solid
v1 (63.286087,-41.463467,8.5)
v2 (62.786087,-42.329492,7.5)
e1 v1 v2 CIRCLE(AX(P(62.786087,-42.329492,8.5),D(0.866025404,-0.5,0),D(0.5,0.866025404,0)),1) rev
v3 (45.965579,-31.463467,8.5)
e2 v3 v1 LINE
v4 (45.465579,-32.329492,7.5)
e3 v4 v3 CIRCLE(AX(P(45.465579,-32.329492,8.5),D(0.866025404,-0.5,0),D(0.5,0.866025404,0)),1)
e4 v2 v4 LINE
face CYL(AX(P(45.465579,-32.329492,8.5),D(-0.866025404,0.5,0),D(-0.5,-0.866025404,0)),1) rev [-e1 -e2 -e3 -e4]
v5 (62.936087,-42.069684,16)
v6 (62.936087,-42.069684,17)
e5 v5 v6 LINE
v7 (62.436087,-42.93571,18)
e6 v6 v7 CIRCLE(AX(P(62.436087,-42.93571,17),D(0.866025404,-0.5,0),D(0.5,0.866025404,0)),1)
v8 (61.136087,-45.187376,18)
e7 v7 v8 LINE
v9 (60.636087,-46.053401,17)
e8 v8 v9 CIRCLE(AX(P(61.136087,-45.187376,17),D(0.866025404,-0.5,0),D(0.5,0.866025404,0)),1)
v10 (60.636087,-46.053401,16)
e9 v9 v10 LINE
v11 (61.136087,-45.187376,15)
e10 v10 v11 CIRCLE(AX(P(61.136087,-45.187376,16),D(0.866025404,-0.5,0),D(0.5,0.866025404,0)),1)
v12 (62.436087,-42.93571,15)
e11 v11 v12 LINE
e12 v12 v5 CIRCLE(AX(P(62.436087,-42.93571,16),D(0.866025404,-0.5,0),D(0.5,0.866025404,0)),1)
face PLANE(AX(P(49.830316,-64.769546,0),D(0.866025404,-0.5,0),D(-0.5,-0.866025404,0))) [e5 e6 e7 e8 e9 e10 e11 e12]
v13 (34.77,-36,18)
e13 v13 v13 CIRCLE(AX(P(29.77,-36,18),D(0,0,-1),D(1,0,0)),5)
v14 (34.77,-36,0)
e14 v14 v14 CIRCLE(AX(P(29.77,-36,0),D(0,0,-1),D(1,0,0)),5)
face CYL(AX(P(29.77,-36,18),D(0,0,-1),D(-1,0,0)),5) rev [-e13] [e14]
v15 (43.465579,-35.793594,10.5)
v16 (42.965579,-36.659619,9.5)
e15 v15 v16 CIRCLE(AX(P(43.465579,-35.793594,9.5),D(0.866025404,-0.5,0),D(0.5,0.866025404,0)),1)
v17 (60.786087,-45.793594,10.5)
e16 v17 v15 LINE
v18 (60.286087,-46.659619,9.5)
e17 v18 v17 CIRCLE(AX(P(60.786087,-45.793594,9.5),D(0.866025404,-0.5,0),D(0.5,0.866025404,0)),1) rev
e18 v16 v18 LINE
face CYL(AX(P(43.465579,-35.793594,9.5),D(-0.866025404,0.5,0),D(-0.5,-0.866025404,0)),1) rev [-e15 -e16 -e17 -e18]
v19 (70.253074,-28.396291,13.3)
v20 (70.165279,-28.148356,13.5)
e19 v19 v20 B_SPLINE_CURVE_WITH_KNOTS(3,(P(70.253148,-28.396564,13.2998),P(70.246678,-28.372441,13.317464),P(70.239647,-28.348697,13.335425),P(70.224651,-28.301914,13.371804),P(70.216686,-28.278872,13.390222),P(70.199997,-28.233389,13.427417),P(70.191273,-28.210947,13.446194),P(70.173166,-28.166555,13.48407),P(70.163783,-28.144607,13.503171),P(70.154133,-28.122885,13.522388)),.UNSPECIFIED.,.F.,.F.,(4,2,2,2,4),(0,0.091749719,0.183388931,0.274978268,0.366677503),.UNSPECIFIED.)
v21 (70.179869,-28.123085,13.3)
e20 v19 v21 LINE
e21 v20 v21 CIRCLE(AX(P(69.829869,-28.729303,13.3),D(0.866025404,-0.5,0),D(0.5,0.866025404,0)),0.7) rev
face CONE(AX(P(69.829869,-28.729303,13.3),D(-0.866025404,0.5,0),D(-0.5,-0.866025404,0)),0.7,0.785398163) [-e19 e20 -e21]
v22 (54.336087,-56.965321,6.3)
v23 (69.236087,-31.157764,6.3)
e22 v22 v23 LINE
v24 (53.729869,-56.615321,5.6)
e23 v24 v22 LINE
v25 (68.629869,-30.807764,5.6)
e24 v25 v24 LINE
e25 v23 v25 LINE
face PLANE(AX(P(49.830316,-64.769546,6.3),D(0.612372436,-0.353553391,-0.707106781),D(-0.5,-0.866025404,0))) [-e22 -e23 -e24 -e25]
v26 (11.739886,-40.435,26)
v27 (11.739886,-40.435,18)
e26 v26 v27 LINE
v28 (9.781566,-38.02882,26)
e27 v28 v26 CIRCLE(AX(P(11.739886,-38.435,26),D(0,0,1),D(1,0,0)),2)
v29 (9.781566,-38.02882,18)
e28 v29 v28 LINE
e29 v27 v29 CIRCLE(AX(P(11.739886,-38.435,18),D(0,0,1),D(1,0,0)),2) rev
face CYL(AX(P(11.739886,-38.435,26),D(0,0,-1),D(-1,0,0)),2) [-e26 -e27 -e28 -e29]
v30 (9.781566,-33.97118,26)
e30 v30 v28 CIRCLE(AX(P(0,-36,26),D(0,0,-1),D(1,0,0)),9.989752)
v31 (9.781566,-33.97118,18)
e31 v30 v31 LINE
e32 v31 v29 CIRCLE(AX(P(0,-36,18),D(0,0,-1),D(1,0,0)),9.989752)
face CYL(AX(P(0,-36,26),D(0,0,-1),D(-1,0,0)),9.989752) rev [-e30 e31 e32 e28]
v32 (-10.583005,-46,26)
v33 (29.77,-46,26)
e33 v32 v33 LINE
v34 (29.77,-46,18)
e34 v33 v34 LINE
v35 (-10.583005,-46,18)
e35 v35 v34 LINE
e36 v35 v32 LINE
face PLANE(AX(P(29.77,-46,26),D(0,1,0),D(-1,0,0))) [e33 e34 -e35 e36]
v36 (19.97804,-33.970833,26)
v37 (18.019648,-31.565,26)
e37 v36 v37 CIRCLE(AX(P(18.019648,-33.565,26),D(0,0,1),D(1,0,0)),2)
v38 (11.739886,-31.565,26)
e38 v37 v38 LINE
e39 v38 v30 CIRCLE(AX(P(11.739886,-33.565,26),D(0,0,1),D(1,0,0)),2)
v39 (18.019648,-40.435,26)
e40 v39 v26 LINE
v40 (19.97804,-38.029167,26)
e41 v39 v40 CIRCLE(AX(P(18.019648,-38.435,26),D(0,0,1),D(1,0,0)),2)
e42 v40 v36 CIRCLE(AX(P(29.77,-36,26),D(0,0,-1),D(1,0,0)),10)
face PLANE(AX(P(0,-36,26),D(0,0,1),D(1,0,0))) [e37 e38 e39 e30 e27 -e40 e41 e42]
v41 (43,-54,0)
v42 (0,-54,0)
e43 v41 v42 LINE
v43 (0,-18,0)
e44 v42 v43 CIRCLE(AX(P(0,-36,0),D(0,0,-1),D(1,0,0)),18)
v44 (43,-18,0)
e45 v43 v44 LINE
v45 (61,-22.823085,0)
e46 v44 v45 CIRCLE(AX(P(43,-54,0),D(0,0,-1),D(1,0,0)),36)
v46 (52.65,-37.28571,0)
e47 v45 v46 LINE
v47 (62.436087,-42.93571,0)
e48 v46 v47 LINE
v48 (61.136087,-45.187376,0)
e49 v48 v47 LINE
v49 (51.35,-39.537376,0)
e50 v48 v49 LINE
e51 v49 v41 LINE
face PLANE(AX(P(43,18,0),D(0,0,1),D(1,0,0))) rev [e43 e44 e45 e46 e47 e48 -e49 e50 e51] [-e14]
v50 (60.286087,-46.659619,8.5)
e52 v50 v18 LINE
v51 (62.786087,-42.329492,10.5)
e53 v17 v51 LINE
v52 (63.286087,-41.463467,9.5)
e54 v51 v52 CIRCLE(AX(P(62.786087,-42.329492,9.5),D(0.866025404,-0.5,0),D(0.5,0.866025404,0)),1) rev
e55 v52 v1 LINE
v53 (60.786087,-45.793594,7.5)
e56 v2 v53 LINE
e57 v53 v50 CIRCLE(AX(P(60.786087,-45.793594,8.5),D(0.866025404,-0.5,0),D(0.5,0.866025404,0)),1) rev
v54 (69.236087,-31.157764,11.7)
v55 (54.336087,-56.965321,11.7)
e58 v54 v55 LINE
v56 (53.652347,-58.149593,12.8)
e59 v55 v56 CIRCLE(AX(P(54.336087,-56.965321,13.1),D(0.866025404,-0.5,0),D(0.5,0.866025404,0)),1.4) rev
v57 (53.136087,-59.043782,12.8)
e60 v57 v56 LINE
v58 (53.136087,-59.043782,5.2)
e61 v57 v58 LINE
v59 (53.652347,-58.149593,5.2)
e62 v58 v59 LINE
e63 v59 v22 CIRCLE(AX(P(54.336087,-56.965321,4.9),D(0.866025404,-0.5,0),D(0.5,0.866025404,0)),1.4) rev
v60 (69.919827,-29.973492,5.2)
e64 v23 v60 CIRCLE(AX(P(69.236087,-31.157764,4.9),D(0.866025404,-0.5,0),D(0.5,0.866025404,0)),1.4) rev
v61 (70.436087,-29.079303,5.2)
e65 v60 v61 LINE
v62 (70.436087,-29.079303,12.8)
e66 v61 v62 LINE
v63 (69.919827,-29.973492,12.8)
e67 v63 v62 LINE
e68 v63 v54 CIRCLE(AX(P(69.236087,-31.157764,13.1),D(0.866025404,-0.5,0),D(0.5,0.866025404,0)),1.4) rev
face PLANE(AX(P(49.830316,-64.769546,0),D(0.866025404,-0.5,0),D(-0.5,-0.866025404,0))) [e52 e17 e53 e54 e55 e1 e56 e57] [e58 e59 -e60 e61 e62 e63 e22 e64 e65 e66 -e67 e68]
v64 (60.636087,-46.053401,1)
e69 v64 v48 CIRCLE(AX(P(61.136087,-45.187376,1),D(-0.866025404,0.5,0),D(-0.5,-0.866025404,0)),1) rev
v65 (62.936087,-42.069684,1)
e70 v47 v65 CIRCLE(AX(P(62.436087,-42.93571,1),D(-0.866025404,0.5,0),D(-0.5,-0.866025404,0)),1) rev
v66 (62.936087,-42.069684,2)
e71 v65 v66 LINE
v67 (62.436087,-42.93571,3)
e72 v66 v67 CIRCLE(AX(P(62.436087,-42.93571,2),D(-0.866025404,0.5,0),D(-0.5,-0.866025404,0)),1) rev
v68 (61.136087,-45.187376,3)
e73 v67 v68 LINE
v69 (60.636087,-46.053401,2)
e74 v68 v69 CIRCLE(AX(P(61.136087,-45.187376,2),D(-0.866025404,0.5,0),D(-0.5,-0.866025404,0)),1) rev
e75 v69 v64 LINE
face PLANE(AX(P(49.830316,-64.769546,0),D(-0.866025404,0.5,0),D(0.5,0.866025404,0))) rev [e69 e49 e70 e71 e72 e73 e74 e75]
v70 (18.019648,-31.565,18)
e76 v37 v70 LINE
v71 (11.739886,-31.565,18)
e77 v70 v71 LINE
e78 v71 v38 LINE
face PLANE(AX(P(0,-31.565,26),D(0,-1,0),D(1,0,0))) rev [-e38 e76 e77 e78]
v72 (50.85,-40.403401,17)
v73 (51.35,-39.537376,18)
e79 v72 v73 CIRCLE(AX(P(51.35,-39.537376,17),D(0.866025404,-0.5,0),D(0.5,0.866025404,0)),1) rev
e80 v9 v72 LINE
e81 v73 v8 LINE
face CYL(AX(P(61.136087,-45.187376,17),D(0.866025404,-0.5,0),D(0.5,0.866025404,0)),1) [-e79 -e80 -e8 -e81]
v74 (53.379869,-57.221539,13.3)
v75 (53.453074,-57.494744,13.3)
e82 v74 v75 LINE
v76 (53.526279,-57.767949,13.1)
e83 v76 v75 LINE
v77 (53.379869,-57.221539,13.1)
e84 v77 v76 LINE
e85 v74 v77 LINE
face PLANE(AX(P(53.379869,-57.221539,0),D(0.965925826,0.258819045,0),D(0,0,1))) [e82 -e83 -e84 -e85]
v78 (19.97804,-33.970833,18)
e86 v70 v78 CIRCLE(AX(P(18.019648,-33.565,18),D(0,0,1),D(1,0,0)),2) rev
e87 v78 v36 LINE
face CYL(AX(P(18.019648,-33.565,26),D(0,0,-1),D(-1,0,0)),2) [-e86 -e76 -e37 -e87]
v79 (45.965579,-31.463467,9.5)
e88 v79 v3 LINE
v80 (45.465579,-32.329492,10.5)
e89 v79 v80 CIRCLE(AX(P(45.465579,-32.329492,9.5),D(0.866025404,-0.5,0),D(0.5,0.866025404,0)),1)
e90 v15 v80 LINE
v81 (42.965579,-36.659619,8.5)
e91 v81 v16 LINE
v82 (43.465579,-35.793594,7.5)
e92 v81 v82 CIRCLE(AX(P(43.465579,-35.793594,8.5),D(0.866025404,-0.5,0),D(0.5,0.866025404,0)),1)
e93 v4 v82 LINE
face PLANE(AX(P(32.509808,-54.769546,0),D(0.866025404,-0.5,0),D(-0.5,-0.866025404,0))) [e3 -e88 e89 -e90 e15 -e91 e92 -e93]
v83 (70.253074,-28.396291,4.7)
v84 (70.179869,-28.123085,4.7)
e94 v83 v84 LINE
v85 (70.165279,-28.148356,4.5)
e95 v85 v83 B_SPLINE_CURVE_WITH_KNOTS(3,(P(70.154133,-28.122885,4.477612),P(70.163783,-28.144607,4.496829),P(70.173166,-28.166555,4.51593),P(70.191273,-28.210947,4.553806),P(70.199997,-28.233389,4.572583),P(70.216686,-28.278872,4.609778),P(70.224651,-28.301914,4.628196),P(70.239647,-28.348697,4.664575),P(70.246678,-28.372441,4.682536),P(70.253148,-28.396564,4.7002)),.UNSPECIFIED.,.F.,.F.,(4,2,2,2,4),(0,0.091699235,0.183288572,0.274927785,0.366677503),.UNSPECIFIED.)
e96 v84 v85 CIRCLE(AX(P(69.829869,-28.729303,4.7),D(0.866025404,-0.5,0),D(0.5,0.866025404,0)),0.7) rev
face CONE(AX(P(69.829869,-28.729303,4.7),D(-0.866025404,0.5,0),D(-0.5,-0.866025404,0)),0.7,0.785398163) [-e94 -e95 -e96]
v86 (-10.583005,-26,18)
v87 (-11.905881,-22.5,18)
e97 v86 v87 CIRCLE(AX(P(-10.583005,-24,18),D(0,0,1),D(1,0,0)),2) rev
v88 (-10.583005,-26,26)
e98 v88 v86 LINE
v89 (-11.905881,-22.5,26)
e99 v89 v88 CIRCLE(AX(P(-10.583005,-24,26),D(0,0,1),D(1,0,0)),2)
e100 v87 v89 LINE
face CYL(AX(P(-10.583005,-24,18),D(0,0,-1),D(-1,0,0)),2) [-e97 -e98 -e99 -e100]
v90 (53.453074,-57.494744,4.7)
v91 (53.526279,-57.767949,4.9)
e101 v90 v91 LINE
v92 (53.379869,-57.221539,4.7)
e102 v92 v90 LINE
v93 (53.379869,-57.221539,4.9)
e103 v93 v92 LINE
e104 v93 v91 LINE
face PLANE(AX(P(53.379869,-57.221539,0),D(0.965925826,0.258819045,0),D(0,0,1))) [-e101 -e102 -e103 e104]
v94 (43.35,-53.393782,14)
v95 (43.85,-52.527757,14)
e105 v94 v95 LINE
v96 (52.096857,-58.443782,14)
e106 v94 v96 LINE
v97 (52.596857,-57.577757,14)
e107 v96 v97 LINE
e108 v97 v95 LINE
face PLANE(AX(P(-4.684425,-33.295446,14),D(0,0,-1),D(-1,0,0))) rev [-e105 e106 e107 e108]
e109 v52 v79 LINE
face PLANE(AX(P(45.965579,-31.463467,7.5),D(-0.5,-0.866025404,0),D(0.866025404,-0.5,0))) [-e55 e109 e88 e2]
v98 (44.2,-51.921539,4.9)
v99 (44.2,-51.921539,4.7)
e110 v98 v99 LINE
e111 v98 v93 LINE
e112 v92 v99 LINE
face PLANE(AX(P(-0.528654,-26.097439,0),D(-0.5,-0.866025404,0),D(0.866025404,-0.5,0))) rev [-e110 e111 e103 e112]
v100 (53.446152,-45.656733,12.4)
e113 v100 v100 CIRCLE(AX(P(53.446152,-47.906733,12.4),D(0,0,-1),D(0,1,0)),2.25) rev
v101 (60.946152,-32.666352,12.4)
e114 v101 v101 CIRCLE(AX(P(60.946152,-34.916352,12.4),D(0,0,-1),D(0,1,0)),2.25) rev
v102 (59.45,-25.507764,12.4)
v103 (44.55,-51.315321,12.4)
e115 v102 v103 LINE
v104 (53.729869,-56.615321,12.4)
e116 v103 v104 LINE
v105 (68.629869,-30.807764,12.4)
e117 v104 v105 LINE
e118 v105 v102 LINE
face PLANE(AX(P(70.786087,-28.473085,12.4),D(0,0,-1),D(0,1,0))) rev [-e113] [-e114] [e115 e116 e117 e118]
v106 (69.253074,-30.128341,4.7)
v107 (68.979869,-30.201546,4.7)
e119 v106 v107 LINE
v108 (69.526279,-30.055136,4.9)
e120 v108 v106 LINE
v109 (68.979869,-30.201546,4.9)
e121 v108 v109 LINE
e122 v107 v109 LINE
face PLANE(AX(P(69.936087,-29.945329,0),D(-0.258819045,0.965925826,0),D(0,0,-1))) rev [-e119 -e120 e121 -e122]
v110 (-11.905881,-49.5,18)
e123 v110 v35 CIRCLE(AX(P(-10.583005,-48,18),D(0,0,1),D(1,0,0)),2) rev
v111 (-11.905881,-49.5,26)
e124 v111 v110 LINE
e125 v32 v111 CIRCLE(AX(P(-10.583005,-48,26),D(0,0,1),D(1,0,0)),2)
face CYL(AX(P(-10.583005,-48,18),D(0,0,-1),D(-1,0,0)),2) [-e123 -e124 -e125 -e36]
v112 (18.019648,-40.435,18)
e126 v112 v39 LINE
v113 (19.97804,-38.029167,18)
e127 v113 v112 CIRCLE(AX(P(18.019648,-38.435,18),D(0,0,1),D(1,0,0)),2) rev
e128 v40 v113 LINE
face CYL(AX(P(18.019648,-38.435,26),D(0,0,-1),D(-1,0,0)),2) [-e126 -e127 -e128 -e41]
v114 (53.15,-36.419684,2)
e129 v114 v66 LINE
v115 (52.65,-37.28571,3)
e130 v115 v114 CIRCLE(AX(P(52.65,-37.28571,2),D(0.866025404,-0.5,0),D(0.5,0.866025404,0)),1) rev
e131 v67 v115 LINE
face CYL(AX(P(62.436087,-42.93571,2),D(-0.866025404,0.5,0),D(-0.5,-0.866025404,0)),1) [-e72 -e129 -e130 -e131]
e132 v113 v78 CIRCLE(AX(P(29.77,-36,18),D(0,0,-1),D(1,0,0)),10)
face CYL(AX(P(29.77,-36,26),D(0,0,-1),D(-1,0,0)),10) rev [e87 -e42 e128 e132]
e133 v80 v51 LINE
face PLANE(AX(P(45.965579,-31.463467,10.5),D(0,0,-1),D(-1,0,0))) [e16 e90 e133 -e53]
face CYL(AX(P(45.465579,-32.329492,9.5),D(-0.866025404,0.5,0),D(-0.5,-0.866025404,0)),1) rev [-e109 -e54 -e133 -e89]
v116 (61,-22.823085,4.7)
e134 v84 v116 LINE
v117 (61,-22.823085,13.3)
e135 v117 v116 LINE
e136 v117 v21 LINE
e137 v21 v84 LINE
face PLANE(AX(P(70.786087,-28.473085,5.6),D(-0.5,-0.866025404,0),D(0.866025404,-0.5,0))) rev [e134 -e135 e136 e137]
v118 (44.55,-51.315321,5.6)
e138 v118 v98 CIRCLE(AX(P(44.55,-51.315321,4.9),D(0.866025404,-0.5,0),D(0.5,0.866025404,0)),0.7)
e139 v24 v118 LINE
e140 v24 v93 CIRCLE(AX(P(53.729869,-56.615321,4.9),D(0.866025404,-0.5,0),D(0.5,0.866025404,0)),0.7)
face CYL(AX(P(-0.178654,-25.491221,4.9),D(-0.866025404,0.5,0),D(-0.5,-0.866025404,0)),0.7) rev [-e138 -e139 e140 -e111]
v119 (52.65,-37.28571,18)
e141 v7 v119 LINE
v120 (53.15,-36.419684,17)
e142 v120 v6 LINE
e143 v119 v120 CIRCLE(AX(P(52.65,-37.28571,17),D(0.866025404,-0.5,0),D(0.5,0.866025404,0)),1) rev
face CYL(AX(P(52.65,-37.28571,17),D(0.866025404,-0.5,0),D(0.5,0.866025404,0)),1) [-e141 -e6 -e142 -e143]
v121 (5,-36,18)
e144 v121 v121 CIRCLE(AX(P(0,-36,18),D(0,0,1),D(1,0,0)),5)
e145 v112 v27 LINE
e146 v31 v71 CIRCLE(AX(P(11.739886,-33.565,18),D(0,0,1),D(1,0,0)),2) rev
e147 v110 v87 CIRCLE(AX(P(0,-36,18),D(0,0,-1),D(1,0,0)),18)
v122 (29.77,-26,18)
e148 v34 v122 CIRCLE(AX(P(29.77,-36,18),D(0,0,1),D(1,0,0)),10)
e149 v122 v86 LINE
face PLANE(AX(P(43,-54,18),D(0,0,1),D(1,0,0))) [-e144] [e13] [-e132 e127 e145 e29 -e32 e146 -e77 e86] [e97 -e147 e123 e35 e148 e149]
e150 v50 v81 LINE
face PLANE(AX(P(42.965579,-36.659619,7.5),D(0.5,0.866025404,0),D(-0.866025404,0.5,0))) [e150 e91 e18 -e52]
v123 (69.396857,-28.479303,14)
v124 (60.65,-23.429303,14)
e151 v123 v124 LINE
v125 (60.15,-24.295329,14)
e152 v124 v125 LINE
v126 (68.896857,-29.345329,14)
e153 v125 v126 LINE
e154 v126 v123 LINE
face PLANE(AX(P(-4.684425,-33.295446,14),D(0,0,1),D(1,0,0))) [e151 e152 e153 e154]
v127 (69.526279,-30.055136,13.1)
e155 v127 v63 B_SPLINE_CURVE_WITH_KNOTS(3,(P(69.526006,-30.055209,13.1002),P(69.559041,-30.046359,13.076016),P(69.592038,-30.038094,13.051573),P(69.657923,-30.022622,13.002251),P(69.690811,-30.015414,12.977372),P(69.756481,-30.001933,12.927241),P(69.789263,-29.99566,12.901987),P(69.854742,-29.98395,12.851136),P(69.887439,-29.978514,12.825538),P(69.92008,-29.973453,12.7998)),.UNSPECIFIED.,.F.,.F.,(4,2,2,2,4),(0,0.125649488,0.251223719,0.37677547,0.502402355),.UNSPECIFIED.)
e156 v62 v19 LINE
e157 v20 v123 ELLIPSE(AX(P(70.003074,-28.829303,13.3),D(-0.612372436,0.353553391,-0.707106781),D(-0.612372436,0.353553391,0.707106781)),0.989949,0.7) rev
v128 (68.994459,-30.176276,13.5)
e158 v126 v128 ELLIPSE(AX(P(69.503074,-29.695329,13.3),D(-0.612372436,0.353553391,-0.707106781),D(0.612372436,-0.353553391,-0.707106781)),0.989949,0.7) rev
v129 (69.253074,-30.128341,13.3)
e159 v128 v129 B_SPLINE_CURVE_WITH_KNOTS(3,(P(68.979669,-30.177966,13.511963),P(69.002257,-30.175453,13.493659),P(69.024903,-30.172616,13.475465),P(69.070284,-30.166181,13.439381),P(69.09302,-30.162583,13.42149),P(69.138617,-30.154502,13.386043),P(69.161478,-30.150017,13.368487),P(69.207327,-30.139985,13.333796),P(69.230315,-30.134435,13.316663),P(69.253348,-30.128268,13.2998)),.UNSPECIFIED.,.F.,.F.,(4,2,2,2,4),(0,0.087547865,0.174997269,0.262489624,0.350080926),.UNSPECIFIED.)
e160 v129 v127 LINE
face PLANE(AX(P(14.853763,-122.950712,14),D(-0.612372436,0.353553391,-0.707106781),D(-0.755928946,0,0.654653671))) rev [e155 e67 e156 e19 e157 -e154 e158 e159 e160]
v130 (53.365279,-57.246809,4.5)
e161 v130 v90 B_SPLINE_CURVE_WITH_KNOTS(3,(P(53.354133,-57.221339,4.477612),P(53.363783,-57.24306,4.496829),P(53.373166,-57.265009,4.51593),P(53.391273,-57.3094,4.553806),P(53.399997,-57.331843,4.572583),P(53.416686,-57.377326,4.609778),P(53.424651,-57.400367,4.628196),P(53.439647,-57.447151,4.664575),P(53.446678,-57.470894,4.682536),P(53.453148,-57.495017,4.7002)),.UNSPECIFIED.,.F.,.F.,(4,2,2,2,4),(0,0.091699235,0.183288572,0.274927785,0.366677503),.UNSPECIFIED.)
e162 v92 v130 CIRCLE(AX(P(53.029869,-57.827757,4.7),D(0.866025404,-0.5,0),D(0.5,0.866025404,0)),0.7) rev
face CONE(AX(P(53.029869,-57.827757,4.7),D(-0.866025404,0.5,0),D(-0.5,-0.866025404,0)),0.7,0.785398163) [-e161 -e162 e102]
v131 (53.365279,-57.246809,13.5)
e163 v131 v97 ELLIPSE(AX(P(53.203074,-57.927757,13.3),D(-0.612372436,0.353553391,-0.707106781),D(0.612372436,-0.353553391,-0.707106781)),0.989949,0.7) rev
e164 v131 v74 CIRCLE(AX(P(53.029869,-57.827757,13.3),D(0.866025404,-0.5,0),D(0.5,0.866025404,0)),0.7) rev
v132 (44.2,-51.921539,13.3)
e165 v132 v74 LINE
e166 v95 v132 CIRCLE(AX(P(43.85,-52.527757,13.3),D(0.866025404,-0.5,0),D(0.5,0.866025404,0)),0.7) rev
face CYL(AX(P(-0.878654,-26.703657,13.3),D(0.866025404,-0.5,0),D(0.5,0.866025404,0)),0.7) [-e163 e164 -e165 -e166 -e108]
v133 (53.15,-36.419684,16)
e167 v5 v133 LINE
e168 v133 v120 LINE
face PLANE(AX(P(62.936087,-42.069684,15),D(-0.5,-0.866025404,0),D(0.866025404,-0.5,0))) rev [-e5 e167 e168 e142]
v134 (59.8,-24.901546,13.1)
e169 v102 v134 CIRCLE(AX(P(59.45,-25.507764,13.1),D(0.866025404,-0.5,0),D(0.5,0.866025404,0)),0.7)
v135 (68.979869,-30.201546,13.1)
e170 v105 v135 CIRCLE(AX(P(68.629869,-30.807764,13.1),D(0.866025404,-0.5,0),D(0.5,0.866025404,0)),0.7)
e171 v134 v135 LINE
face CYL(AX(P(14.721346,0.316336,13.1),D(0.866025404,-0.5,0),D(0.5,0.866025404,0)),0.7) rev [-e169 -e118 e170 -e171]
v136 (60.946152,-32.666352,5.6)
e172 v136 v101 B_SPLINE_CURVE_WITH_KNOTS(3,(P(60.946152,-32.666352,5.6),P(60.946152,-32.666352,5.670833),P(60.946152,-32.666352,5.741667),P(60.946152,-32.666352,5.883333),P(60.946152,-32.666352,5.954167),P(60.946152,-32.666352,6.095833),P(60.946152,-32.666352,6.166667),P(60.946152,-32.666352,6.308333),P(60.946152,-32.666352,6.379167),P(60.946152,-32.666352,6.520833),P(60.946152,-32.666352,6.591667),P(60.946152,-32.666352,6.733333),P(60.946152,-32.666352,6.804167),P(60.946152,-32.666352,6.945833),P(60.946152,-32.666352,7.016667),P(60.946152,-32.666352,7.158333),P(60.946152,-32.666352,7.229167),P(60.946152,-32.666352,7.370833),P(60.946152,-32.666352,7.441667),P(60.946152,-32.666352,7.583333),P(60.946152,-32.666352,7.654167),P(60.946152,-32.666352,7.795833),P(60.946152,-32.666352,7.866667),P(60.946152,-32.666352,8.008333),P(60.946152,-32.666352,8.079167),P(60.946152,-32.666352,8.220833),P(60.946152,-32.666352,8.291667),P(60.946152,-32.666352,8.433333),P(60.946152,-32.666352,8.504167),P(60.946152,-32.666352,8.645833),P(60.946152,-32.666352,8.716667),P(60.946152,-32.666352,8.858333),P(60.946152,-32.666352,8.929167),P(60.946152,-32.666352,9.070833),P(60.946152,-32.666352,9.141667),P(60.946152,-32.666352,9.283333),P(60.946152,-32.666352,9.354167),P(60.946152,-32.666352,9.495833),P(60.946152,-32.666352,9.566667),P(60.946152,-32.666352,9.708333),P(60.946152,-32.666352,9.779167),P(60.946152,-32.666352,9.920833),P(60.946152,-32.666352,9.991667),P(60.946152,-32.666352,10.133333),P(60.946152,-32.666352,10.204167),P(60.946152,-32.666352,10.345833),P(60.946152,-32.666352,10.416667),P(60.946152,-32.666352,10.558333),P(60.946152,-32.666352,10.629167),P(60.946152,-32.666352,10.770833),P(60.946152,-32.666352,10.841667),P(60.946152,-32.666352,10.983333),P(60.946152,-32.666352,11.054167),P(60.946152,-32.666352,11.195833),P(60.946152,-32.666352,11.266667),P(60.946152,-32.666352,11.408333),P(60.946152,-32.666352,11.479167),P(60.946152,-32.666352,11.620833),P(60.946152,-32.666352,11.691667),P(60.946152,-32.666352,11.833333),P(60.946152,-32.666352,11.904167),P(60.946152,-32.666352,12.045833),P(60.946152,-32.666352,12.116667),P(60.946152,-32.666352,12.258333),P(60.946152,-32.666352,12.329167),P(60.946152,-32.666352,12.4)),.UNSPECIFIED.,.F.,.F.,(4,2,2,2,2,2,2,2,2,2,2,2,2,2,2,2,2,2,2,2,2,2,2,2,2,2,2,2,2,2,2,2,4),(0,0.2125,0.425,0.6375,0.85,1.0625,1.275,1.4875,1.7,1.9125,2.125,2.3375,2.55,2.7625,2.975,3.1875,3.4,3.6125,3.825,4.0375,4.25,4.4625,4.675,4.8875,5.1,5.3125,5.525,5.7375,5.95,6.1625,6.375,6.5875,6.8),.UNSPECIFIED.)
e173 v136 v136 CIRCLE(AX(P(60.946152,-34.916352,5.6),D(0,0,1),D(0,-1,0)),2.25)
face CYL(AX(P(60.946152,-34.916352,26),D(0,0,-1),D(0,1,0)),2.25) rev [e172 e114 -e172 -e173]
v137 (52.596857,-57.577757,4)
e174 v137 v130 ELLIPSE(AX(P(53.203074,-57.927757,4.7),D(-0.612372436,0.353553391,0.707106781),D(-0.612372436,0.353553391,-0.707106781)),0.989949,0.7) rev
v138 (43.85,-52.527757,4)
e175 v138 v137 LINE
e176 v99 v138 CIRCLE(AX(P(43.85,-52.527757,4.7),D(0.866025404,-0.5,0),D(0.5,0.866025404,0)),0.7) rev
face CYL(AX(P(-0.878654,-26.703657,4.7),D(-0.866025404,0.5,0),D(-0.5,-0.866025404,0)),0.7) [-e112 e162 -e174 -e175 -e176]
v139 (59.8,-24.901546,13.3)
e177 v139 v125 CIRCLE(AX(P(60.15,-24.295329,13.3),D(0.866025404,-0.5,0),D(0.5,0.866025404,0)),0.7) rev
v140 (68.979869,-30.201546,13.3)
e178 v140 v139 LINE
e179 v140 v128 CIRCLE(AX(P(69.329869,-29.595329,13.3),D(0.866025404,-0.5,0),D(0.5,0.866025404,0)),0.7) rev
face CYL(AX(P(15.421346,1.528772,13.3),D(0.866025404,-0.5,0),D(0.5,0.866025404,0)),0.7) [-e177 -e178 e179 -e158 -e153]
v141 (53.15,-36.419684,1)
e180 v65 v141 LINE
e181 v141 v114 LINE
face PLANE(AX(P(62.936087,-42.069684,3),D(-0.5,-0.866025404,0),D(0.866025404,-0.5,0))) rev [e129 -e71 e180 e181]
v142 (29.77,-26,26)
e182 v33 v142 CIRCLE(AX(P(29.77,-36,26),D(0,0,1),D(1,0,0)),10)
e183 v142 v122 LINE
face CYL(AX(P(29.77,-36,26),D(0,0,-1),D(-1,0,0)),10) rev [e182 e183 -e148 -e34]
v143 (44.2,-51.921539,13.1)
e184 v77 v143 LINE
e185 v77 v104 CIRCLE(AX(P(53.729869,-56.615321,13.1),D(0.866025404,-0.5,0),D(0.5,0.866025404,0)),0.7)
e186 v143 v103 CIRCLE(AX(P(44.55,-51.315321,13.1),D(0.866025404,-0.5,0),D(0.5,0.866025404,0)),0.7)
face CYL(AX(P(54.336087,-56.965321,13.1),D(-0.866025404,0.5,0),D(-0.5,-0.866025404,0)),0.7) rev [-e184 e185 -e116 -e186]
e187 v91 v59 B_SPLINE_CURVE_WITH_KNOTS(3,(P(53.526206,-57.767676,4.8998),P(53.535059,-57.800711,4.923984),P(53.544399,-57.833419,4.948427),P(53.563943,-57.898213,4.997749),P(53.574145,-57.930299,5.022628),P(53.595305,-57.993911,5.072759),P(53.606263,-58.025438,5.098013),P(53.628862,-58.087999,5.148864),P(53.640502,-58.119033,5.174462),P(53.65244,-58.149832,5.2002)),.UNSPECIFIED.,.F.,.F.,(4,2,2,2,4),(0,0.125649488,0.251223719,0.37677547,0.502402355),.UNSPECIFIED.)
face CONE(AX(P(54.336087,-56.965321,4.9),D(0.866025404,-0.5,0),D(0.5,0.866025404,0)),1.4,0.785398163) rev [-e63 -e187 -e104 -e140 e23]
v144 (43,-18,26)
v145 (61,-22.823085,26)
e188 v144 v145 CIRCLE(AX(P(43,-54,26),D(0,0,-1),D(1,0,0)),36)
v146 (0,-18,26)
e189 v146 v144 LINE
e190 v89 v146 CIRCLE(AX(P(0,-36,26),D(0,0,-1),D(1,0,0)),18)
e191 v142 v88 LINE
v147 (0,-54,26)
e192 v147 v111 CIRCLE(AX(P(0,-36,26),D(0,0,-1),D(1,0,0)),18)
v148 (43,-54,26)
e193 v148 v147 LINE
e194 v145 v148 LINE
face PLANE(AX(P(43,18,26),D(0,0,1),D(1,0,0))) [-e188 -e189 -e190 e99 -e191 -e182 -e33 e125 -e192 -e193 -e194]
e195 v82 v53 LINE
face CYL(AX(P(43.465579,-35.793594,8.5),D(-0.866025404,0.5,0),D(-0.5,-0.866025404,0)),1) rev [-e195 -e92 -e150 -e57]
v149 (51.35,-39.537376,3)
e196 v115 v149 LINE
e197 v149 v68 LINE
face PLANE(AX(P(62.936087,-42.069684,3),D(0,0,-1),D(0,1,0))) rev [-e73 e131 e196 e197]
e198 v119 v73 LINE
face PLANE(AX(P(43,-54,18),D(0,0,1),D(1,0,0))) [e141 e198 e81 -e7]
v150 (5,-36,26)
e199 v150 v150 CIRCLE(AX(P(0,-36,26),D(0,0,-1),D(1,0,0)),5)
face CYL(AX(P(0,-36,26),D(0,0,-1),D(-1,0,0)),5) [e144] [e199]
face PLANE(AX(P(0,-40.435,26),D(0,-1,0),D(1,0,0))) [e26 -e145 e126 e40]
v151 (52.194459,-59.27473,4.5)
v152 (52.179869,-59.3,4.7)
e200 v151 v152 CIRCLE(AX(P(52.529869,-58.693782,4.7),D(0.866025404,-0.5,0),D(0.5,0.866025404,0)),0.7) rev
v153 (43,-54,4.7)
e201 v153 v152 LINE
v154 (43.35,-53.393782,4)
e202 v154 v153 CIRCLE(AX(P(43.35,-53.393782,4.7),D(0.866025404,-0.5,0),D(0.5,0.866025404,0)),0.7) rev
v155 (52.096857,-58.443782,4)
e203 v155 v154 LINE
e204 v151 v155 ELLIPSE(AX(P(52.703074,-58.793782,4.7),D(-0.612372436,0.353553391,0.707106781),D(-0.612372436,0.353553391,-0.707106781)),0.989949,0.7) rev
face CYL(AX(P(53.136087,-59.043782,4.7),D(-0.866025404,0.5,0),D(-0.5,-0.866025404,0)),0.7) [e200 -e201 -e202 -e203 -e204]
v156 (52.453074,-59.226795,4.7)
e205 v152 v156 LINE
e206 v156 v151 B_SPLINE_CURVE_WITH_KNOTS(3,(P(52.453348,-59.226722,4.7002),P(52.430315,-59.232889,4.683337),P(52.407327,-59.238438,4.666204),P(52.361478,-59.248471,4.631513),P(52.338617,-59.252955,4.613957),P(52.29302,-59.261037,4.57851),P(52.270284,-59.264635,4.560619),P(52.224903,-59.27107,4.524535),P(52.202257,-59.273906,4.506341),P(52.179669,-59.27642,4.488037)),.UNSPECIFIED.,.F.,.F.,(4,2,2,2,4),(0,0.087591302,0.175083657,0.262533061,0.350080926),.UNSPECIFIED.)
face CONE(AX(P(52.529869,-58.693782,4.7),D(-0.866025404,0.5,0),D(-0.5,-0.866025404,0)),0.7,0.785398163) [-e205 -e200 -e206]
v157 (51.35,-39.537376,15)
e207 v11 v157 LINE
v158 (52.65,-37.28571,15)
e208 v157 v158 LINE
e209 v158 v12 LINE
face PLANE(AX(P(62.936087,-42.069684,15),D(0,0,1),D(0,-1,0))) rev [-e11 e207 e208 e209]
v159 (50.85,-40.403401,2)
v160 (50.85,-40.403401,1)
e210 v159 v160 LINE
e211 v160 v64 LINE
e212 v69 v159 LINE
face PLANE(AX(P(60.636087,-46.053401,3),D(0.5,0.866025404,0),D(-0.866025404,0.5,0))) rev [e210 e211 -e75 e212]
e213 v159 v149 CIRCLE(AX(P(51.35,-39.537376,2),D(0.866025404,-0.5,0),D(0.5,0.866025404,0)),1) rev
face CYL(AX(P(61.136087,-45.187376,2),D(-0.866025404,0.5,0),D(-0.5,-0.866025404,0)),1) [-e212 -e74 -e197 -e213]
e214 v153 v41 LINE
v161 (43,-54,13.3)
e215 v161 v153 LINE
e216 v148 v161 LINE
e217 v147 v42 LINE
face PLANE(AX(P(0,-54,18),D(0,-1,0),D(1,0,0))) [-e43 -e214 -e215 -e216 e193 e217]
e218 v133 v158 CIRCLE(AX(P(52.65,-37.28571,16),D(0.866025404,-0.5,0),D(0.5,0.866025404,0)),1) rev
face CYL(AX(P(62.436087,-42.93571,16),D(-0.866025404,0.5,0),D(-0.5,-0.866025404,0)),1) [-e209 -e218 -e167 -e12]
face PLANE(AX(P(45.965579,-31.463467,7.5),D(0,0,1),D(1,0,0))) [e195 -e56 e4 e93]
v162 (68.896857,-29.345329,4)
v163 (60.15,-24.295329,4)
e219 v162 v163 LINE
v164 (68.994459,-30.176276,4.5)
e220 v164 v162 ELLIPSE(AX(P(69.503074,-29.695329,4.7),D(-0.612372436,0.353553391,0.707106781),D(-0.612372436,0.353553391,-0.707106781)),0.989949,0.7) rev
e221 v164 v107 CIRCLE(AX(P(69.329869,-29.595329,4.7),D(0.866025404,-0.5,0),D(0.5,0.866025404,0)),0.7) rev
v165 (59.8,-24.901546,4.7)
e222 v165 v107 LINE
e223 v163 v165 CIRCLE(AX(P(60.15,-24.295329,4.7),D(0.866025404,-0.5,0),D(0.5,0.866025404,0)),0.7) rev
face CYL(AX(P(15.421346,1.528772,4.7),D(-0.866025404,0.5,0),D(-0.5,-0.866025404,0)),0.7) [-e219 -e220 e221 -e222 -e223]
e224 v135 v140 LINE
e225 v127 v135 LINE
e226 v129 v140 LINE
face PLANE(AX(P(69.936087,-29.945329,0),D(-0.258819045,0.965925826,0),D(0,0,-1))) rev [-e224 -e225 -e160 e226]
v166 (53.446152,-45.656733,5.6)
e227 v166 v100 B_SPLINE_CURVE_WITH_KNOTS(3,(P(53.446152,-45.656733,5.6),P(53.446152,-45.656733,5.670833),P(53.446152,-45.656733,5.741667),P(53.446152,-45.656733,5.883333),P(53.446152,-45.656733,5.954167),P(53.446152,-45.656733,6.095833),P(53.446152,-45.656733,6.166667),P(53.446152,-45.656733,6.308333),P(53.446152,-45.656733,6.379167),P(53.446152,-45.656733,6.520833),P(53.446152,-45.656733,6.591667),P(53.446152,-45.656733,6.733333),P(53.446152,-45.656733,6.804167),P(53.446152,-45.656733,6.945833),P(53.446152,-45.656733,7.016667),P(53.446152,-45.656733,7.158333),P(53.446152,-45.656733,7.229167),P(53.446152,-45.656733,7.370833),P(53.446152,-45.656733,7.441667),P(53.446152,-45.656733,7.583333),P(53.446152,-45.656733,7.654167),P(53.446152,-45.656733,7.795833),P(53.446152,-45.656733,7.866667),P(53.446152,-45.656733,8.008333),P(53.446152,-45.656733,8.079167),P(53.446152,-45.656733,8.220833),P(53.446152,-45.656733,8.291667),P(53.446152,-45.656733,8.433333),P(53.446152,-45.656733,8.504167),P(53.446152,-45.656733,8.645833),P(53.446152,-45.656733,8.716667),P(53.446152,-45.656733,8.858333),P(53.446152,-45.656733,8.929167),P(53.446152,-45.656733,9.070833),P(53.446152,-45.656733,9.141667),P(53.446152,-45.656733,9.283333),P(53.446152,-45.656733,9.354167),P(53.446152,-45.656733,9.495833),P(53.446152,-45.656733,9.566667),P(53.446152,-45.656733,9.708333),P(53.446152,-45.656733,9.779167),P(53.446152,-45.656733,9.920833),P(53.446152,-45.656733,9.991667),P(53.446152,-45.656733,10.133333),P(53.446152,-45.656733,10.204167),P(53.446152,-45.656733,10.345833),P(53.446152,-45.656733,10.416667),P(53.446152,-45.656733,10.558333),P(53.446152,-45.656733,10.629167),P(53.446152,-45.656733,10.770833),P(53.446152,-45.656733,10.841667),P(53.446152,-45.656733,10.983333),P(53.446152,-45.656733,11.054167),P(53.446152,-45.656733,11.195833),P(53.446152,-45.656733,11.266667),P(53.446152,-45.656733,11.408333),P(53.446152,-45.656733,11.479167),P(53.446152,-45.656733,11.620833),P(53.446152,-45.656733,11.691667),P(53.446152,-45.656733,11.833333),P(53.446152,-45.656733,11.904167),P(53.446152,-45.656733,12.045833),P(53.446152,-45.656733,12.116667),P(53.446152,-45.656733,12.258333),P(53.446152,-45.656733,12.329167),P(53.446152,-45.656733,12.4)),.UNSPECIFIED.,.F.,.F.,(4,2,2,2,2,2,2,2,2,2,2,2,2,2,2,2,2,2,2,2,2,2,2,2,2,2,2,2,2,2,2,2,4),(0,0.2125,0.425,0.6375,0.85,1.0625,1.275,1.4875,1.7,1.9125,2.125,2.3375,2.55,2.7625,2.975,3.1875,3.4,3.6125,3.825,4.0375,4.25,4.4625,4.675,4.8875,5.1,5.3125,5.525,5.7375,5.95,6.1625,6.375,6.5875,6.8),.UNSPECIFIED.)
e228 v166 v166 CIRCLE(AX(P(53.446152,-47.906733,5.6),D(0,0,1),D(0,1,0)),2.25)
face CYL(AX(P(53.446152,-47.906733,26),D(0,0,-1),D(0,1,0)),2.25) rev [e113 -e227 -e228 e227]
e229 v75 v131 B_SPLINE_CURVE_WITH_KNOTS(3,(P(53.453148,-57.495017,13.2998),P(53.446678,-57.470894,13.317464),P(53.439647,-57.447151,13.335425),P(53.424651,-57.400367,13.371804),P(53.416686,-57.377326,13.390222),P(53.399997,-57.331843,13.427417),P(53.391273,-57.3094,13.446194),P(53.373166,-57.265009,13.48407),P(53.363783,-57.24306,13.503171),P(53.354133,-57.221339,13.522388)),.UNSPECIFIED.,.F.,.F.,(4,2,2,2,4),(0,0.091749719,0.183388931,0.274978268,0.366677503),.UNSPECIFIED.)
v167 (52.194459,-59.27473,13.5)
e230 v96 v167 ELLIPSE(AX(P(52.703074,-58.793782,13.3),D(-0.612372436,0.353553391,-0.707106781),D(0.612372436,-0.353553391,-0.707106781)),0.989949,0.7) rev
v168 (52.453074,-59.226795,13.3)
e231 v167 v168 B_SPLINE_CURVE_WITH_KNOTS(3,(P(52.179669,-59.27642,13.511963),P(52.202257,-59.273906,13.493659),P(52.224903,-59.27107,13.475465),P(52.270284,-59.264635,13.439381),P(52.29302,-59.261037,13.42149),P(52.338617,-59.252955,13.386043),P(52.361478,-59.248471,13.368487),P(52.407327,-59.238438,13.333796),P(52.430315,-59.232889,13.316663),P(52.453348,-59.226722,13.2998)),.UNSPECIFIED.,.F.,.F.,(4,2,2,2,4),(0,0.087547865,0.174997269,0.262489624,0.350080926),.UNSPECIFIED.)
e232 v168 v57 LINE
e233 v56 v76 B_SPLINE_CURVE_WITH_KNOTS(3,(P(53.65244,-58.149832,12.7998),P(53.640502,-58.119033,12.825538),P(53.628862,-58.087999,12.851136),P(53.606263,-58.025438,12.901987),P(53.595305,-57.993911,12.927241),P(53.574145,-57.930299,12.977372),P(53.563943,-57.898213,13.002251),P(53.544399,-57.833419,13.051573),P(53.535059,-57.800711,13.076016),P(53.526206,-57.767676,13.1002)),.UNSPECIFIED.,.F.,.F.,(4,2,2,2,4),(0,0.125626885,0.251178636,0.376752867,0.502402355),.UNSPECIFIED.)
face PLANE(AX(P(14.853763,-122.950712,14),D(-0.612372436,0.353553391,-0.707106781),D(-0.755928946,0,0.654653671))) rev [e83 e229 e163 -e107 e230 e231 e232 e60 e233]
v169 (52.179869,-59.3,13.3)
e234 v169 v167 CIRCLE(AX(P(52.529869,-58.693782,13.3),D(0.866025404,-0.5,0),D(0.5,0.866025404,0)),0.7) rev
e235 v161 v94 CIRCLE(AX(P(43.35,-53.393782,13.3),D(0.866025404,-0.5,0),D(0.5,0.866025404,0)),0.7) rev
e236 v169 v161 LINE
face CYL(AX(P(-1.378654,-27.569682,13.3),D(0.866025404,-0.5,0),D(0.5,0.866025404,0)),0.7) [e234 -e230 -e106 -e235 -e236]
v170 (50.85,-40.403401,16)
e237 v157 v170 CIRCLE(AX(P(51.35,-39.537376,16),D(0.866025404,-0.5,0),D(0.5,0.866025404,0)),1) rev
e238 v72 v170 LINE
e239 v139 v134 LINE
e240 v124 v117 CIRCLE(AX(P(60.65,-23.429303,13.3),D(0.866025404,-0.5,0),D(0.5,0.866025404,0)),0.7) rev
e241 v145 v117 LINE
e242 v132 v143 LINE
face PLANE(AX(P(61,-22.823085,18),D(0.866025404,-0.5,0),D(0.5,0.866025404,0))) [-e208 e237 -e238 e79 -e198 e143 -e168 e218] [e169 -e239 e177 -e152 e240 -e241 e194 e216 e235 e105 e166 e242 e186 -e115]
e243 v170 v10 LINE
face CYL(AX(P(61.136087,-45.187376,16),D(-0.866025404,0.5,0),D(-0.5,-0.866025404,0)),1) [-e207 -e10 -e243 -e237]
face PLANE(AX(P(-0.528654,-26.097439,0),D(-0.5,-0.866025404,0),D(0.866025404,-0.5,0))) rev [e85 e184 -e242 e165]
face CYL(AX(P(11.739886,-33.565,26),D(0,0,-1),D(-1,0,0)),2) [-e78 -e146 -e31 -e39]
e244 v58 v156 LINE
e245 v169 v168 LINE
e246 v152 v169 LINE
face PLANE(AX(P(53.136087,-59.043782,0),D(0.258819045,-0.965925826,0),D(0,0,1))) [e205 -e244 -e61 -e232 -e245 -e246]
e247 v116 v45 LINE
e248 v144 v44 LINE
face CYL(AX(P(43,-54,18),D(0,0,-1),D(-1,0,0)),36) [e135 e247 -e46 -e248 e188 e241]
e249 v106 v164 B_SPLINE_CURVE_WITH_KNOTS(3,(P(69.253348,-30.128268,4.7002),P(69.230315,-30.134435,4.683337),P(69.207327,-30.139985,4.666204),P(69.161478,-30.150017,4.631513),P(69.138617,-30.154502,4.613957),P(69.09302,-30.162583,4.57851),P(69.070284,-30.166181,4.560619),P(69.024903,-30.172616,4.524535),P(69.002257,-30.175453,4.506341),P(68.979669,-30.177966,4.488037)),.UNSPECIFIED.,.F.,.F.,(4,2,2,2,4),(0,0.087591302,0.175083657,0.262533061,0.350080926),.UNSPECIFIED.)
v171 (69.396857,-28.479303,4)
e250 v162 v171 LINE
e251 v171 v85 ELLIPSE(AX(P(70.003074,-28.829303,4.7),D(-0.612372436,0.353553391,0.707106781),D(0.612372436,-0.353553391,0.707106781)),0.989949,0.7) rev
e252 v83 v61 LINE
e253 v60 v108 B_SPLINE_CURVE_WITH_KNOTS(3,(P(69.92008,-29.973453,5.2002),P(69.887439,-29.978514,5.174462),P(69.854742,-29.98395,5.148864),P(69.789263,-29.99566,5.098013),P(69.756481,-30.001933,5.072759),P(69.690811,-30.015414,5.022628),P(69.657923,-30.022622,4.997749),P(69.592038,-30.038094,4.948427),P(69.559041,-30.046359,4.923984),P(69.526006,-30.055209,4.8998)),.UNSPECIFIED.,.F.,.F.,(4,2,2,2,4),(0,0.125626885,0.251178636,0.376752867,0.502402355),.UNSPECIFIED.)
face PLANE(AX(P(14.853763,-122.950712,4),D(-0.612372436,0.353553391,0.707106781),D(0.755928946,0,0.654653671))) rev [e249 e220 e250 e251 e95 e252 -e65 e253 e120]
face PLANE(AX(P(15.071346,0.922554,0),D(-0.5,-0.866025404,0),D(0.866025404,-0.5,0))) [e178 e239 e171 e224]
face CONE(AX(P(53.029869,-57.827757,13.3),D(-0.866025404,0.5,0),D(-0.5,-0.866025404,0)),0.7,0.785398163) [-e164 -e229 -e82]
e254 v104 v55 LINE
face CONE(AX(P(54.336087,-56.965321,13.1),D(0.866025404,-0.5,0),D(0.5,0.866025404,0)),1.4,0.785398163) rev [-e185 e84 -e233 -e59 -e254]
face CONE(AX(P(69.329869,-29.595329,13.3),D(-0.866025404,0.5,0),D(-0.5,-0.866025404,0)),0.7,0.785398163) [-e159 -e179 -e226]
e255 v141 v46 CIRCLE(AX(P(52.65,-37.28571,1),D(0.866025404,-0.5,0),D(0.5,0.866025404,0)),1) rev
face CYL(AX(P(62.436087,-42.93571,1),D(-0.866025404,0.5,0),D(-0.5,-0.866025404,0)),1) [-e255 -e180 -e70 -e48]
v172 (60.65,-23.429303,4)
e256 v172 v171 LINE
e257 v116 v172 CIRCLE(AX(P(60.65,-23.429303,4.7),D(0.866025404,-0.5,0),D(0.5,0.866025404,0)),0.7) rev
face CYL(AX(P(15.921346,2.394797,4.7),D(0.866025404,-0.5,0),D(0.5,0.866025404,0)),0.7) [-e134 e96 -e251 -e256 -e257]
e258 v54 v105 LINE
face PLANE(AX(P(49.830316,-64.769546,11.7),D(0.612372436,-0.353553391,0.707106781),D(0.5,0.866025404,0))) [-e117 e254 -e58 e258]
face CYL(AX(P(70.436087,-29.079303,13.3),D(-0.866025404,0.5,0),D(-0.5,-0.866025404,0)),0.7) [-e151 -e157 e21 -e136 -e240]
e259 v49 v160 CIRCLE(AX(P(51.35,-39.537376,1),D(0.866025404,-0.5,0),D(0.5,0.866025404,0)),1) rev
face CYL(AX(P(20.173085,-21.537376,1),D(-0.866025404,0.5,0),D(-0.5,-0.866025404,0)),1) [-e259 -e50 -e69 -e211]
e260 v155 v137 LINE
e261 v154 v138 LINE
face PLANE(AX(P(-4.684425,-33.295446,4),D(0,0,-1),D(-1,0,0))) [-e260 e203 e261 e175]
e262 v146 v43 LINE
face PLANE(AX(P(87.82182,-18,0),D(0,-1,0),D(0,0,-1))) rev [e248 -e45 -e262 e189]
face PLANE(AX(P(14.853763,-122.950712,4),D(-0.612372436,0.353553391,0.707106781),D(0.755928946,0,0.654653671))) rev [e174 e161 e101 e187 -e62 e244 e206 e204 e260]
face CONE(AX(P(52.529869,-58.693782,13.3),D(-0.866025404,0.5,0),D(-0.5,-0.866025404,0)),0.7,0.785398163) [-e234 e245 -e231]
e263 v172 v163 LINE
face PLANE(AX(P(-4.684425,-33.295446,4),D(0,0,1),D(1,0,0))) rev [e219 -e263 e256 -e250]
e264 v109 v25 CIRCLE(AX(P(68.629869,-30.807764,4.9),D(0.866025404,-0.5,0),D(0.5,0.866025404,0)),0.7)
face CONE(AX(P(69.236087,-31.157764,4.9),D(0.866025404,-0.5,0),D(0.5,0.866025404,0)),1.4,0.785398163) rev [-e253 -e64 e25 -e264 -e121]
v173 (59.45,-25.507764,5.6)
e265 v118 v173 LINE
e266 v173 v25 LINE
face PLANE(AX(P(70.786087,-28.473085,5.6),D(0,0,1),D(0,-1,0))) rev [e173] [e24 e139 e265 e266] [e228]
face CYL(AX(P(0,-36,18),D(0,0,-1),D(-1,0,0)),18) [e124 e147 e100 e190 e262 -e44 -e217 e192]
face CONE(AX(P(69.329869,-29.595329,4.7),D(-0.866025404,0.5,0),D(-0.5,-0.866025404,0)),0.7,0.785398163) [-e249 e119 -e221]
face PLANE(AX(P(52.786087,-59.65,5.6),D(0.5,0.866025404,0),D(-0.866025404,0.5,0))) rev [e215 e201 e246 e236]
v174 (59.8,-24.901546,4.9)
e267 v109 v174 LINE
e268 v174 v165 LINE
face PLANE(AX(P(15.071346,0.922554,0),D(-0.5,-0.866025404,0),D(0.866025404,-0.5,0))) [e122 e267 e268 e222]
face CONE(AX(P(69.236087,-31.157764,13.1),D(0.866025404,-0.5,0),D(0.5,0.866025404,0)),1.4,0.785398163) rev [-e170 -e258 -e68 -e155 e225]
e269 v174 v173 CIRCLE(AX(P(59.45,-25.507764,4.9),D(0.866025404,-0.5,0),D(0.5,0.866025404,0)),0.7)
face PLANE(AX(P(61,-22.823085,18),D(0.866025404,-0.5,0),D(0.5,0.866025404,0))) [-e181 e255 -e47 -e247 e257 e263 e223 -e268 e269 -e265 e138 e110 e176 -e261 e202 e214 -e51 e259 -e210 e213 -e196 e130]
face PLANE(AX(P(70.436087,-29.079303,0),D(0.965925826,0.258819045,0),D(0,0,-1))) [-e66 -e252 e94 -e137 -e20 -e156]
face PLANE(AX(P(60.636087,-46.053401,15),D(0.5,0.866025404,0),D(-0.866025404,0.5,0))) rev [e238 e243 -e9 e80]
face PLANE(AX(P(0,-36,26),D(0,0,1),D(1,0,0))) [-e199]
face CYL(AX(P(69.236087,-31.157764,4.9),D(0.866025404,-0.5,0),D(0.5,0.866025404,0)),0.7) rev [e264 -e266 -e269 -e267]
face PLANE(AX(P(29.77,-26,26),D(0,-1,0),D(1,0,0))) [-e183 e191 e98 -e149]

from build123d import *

# Parameters (mm, degrees)
SKETCH_1_R          = 4.9999999999999964
EXTRUDE_1_DEPTH     = 18
SKETCH_2_R          = 5
EXTRUDE_2_DEPTH     = 8
FILLET_2_R          = 2
EXTRUDE_4_DEPTH     = 11.3
SKETCH_8_W          = 3.000000000000001
SKETCH_8_H          = 6.0000000000000036
CUT_EXTRUDE_3_DEPTH = 20
SKETCH_9_R          = 2.250000000000002
CUT_EXTRUDE_4_DEPTH = 78.37023084919184
FILLET_1_R          = 1
EXTRUDE_5_DEPTH     = 8
FILLET_3_R          = 2
EXTRUDE_6_DEPTH     = 11.3
FILLET_4_R          = 0.7
CHAMFER_2_SIZE      = 0.7
CUT_EXTRUDE_5_REACH = 123.985
CUT_EXTRUDE_6_DEPTH = 96.67513972142032


# Read off the part's stored shape, not the designer's step: 镜向1
with BuildPart() as part:
    # 草图1 → 凸台-拉伸1 (new body)
    with BuildSketch(Plane.XY):
        with BuildLine():
            Line((61.00000000000003, -13.176914536239765), (43, 17.999999999999996))
            Line((43, 17.999999999999996), (0, 18))
            ThreePointArc((0, 18), (-18, 2.2e-15), (0, -18))
            Line((0, -18), (43, -17.999999999999996))
            ThreePointArc((43, -17.999999999999996), (52.31748562369077, -16.77332974640645), (61.00000000000003, -13.176914536239765))
        make_face()
        with Locations((29.77, 0)):
            Circle(SKETCH_1_R, mode=Mode.SUBTRACT)
    extrude(amount=EXTRUDE_1_DEPTH)

    # 草图2 → 凸台-拉伸2 (add)
    with BuildSketch(Plane.XY.offset(18)):
        with BuildLine():
            Line((8.951308150188659, -4.435), (20.807256279464415, -4.435))
            ThreePointArc((20.807256279464415, -4.434999999999999), (19.769999999999996, 4.4e-16), (20.807256279464415, 4.435))
            Line((20.807256279464415, 4.435), (8.951308150188659, 4.435))
            ThreePointArc((8.951308150188659, 4.434999999999999), (9.989751878782268, -6.7e-16), (8.951308150188659, -4.435))
        make_face()
        Circle(SKETCH_2_R)
    extrude(amount=EXTRUDE_2_DEPTH)

    # 圆角2
    fillet_2_edges = [part.edges().sort_by_distance(p)[0] for p in [
        (20.807256279464415, -4.434999999999999, 22),
        (20.807256279464415, 4.434999999999999, 22),
        (8.951308150188659, 4.434999999999999, 22),
        (8.951308150188659, -4.434999999999999, 22),
    ]]
    fillet(fillet_2_edges, radius=FILLET_2_R)

    # 草图7 → 凸台-拉伸4 (add)
    with BuildSketch(Plane(origin=(33.99999999999993, 33.588457268120045, 0), x_dir=(0, 0, -1), z_dir=(-0.866025403784438, -0.5000000000000009, 0))):
        Polygon((-5.599999999999984, 54.00000000000014), (-12.400000000000015, 54.00000000000014), (-12.400000000000004, 18.00000000000018), (-5.599999999999972, 18.00000000000019), align=None)
        Polygon((-2.9999999999999973, 33.70000000000016), (-1.041e-14, 33.70000000000016), (-1.041e-14, 38.30000000000017), (-2.9999999999999956, 38.30000000000017), align=None)
        Polygon((-15.000000000000004, 38.30000000000017), (-17.99999999999999, 38.30000000000017), (-17.99999999999999, 33.70000000000016), (-15.000000000000002, 33.70000000000016), align=None)
    extrude(amount=-EXTRUDE_4_DEPTH)

    # 草图8 → 切除-拉伸3 (cut)
    with BuildSketch(Plane(origin=(49.8303156968241, 28.769546181365495, -2.936e-14), x_dir=(-5.4e-16, -3.2e-16, 1), z_dir=(0.866025403784438, 0.500000000000001, 0))):
        with Locations((8.99999999999995, 23.911542731880154)):
            Rectangle(SKETCH_8_W, SKETCH_8_H)
    extrude(amount=-CUT_EXTRUDE_3_DEPTH, mode=Mode.SUBTRACT)

    # 草图9 → 切除-拉伸4 (cut, through all)
    with BuildSketch(Plane(origin=(-8.8e-16, 1.52e-15, 5.59999999999997), x_dir=(-1, 0, -1e-16), z_dir=(1e-16, -1.7e-16, -1))):
        with Locations(Location((-60.946152422706646, -1.0836477965031495, 0), (0, 0, 90))):
            Circle(SKETCH_9_R)
        with Locations(Location((-53.44615242270663, 11.90673326026341, 0), (0, 0, 90))):
            Circle(SKETCH_9_R)
    extrude(amount=-CUT_EXTRUDE_4_DEPTH, mode=Mode.SUBTRACT)

    # 圆角1
    fillet_1_edges = [part.edges().sort_by_distance(p)[0] for p in [
        (54.62583302491982, 0.4634665205268087, 10.499999999999913),
        (51.625833024919814, 5.659618943233441, 10.499999999999913),
        (51.625833024919814, 5.659618943233441, 7.499999999999914),
        (54.62583302491982, 0.4634665205268087, 7.499999999999914),
        (55.74304353138211, 7.2284011605843475, 17.99999999999999),
        (58.043043531382125, 3.244684303175926, 17.99999999999999),
        (58.043043531382125, 3.244684303175926, 15.000000000000004),
        (55.74304353138211, 7.2284011605843475, 15.000000000000002),
        (55.74304353138211, 7.2284011605843475, 2.9999999999999973),
        (58.043043531382125, 3.244684303175926, 2.9999999999999956),
        (58.043043531382125, 3.244684303175926, 1.041e-14),
        (55.74304353138211, 7.2284011605843475, 1.041e-14),
    ]]
    fillet(fillet_1_edges, radius=FILLET_1_R)

    # 草图10 → 凸台-拉伸5 (add)
    with BuildSketch(Plane.XY.offset(18)):
        with BuildLine():
            Line((29.77, -10), (-14.966629547095765, -10))
            ThreePointArc((-14.966629547095765, -10), (-8.48528137423857, -15.874507866387544), (0, -18.000000000000004))
            Line((0, -18.000000000000004), (43, -17.999999999999996))
            ThreePointArc((43, -17.999999999999996), (52.31748562369077, -16.77332974640645), (61.00000000000003, -13.176914536239769))
            Line((61.00000000000003, -13.176914536239769), (43, 17.999999999999996))
            Line((43, 17.999999999999996), (0, 18.000000000000004))
            ThreePointArc((0, 18.000000000000004), (-8.485281374238571, 15.874507866387546), (-14.966629547095765, 10))
            Line((-14.966629547095765, 10), (29.77, 10))
            ThreePointArc((29.77, 10), (39.769999999999996, 0), (29.77, -10))
        make_face()
    extrude(amount=EXTRUDE_5_DEPTH)

    # 圆角3
    fillet_3_edges = [part.edges().sort_by_distance(p)[0] for p in [
        (-14.966629547095767, 10, 22),
        (-14.966629547095767, -10.000000000000002, 22),
    ]]
    fillet(fillet_3_edges, radius=FILLET_3_R)

    # 草图11 → 凸台-拉伸6 (add)
    with BuildSketch(Plane(origin=(49.8303156968241, 28.769546181365495, -2.936e-14), x_dir=(5.8e-16, 2.6e-16, -1), z_dir=(0.866025403784438, 0.500000000000001, 0))):
        Polygon((-12.400000000000041, -39.51154273188015), (-13.999999999999961, -39.51154273188015), (-13.999999999999966, -41.91154273188013), (-12.400000000000041, -41.91154273188013), align=None)
        Polygon((-3.999999999999961, -39.51154273188015), (-5.6000000000000085, -39.51154273188015), (-5.60000000000001, -41.91154273188014), (-3.99999999999997, -41.91154273188013), align=None)
        Polygon((-5.600000000000001, -5.911542731880182), (-5.600000000000002, -8.31154273188016), (-3.999999999999961, -8.31154273188016), (-3.999999999999969, -5.911542731880172), align=None)
        Polygon((-13.999999999999966, -5.911542731880174), (-13.999999999999966, -8.31154273188016), (-12.400000000000034, -8.31154273188016), (-12.400000000000034, -5.911542731880178), align=None)
    extrude(amount=-EXTRUDE_6_DEPTH)

    # 圆角4
    fillet_4_edges = [part.edges().sort_by_distance(p)[0] for p in [
        (64.69304353138213, -8.273453567157098, 13.999999999999932),
        (64.69304353138213, -8.273453567157091, 12.40000000000001),
        (65.89304353138213, -10.35191453623974, 13.999999999999936),
        (64.69304353138213, -8.273453567157091, 5.599999999999978),
        (64.69304353138213, -8.273453567157091, 3.9999999999999343),
        (65.89304353138213, -10.351914536239732, 3.999999999999939),
        (47.89304353138211, 20.825000000000003, 3.999999999999937),
        (49.09304353138211, 18.74653903091736, 3.999999999999932),
        (49.09304353138211, 18.74653903091736, 5.5999999999999694),
        (49.09304353138211, 18.746539030917358, 13.99999999999993),
        (49.09304353138211, 18.746539030917358, 12.4),
        (47.89304353138211, 20.825, 13.999999999999932),
    ]]
    fillet(fillet_4_edges, radius=FILLET_4_R)

    # 倒角2
    chamfer_2_edges = [part.edges().sort_by_distance(p)[0] for p in [
        (53.986087062764184, 21.571539030917368, 4.799999999999956),
        (61.7860870627642, 8.061542731880138, 12.40000000000001),
        (69.58608706276421, -5.448453567157085, 13.199999999999976),
        (70.1860870627642, -6.4876840516984196, 13.999999999999938),
        (70.78608706276421, -7.52691453623973, 8.99999999999994),
        (70.1860870627642, -6.487684051698405, 3.999999999999942),
        (69.58608706276421, -5.448453567157085, 4.799999999999963),
        (61.786087062764196, 8.061542731880149, 5.599999999999977),
        (53.38608706276419, 22.61076951545869, 3.99999999999994),
        (52.78608706276419, 23.650000000000006, 8.99999999999994),
        (53.38608706276418, 22.610769515458685, 13.999999999999936),
        (53.986087062764184, 21.571539030917364, 13.199999999999969),
        (70.6835744361795, -7.349357458577688, 4.205025253169361),
        (70.6835744361795, -7.349357458577694, 13.794974746830517),
        (52.88859968934889, 23.47244292233795, 13.79497474683052),
        (52.888599689348894, 23.472442922337958, 4.205025253169356),
        (69.6885996893489, -5.626010644819133, 4.20502525316936),
        (69.6885996893489, -5.62601064481914, 13.79497474683052),
        (53.883574436179465, 21.749096108579412, 13.794974746830519),
        (53.88357443617947, 21.74909610857942, 4.205025253169357),
        (54.0885996893489, 21.393981953255317, 5.394974746830557),
        (54.08859968934889, 21.393981953255313, 12.60502525316942),
        (69.4835744361795, -5.27089648949504, 12.60502525316943),
        (69.48357443617951, -5.270896489495035, 5.394974746830568),
    ]]
    chamfer(chamfer_2_edges, length=CHAMFER_2_SIZE)

    # 切除-拉伸5: up to this face of the body (flat: up to its plane)
    cut_extrude_5_end = Plane(part.part.faces().sort_by_distance((47.58993464, 20.65, 9))[0])
    # 草图12 → 切除-拉伸5 (cut, up to the picked face)
    with BuildSketch(Plane(origin=(98.23909236273093, 8.323085463760323, 0), x_dir=(-0.866025403784438, -0.500000000000001, 0), z_dir=(-0.500000000000001, 0.866025403784438, 0)), mode=Mode.PRIVATE) as cut_extrude_5_sk1:
        Polygon((31.700000000000067, 12.799999999999999), (31.700000000000067, 13.999999999999998), (32.90000000000007, 13.999999999999996), align=None)
    cut_extrude_5_tool1 = split(extrude(cut_extrude_5_sk1.sketch, amount=CUT_EXTRUDE_5_REACH, mode=Mode.PRIVATE), bisect_by=cut_extrude_5_end, keep=Keep.BOTH, mode=Mode.PRIVATE)
    # 草图12 → 切除-拉伸5 (cut, up to the picked face)
    with BuildSketch(Plane(origin=(98.23909236273093, 8.323085463760323, 0), x_dir=(-0.866025403784438, -0.500000000000001, 0), z_dir=(-0.500000000000001, 0.866025403784438, 0)), mode=Mode.PRIVATE) as cut_extrude_5_sk2:
        Polygon((31.700000000000067, 4.0000000000000036), (32.90000000000007, 4.000000000000005), (31.700000000000067, 5.200000000000003), align=None)
    cut_extrude_5_tool2 = split(extrude(cut_extrude_5_sk2.sketch, amount=CUT_EXTRUDE_5_REACH, mode=Mode.PRIVATE), bisect_by=cut_extrude_5_end, keep=Keep.BOTH, mode=Mode.PRIVATE)
    add(cut_extrude_5_tool1.solids().sort_by(Axis((70.439677, -7.726915, 13.6), (-0.500000000000001, 0.866025403784438, 0)))[0], mode=Mode.SUBTRACT)
    add(cut_extrude_5_tool2.solids().sort_by(Axis((70.439677, -7.726915, 4.4), (-0.500000000000001, 0.866025403784438, 0)))[0], mode=Mode.SUBTRACT)

    # 镜向1: part across plane


with BuildPart() as part_1:
    add(part.part)
    add(part.part.mirror(Plane(origin=(0, -18, 18), x_dir=(0, 0, 1), z_dir=(-8e-17, 1, 0))))

    # 草图13 → 切除-拉伸6 (cut, through all)
    with BuildSketch(Plane.XY.offset(26)):
        Polygon((-3.31e-15, -17.999999999999996), (43, -17.999999999999996), (87.8218201095251, -17.999999999999996), (87.8218201095251, 39.78196622179553), (-28.896212069890126, 39.78196622179553), (-28.896212069890126, -17.999999999999996), align=None)
    extrude(amount=-CUT_EXTRUDE_6_DEPTH, mode=Mode.SUBTRACT)


solid = part_1.part
